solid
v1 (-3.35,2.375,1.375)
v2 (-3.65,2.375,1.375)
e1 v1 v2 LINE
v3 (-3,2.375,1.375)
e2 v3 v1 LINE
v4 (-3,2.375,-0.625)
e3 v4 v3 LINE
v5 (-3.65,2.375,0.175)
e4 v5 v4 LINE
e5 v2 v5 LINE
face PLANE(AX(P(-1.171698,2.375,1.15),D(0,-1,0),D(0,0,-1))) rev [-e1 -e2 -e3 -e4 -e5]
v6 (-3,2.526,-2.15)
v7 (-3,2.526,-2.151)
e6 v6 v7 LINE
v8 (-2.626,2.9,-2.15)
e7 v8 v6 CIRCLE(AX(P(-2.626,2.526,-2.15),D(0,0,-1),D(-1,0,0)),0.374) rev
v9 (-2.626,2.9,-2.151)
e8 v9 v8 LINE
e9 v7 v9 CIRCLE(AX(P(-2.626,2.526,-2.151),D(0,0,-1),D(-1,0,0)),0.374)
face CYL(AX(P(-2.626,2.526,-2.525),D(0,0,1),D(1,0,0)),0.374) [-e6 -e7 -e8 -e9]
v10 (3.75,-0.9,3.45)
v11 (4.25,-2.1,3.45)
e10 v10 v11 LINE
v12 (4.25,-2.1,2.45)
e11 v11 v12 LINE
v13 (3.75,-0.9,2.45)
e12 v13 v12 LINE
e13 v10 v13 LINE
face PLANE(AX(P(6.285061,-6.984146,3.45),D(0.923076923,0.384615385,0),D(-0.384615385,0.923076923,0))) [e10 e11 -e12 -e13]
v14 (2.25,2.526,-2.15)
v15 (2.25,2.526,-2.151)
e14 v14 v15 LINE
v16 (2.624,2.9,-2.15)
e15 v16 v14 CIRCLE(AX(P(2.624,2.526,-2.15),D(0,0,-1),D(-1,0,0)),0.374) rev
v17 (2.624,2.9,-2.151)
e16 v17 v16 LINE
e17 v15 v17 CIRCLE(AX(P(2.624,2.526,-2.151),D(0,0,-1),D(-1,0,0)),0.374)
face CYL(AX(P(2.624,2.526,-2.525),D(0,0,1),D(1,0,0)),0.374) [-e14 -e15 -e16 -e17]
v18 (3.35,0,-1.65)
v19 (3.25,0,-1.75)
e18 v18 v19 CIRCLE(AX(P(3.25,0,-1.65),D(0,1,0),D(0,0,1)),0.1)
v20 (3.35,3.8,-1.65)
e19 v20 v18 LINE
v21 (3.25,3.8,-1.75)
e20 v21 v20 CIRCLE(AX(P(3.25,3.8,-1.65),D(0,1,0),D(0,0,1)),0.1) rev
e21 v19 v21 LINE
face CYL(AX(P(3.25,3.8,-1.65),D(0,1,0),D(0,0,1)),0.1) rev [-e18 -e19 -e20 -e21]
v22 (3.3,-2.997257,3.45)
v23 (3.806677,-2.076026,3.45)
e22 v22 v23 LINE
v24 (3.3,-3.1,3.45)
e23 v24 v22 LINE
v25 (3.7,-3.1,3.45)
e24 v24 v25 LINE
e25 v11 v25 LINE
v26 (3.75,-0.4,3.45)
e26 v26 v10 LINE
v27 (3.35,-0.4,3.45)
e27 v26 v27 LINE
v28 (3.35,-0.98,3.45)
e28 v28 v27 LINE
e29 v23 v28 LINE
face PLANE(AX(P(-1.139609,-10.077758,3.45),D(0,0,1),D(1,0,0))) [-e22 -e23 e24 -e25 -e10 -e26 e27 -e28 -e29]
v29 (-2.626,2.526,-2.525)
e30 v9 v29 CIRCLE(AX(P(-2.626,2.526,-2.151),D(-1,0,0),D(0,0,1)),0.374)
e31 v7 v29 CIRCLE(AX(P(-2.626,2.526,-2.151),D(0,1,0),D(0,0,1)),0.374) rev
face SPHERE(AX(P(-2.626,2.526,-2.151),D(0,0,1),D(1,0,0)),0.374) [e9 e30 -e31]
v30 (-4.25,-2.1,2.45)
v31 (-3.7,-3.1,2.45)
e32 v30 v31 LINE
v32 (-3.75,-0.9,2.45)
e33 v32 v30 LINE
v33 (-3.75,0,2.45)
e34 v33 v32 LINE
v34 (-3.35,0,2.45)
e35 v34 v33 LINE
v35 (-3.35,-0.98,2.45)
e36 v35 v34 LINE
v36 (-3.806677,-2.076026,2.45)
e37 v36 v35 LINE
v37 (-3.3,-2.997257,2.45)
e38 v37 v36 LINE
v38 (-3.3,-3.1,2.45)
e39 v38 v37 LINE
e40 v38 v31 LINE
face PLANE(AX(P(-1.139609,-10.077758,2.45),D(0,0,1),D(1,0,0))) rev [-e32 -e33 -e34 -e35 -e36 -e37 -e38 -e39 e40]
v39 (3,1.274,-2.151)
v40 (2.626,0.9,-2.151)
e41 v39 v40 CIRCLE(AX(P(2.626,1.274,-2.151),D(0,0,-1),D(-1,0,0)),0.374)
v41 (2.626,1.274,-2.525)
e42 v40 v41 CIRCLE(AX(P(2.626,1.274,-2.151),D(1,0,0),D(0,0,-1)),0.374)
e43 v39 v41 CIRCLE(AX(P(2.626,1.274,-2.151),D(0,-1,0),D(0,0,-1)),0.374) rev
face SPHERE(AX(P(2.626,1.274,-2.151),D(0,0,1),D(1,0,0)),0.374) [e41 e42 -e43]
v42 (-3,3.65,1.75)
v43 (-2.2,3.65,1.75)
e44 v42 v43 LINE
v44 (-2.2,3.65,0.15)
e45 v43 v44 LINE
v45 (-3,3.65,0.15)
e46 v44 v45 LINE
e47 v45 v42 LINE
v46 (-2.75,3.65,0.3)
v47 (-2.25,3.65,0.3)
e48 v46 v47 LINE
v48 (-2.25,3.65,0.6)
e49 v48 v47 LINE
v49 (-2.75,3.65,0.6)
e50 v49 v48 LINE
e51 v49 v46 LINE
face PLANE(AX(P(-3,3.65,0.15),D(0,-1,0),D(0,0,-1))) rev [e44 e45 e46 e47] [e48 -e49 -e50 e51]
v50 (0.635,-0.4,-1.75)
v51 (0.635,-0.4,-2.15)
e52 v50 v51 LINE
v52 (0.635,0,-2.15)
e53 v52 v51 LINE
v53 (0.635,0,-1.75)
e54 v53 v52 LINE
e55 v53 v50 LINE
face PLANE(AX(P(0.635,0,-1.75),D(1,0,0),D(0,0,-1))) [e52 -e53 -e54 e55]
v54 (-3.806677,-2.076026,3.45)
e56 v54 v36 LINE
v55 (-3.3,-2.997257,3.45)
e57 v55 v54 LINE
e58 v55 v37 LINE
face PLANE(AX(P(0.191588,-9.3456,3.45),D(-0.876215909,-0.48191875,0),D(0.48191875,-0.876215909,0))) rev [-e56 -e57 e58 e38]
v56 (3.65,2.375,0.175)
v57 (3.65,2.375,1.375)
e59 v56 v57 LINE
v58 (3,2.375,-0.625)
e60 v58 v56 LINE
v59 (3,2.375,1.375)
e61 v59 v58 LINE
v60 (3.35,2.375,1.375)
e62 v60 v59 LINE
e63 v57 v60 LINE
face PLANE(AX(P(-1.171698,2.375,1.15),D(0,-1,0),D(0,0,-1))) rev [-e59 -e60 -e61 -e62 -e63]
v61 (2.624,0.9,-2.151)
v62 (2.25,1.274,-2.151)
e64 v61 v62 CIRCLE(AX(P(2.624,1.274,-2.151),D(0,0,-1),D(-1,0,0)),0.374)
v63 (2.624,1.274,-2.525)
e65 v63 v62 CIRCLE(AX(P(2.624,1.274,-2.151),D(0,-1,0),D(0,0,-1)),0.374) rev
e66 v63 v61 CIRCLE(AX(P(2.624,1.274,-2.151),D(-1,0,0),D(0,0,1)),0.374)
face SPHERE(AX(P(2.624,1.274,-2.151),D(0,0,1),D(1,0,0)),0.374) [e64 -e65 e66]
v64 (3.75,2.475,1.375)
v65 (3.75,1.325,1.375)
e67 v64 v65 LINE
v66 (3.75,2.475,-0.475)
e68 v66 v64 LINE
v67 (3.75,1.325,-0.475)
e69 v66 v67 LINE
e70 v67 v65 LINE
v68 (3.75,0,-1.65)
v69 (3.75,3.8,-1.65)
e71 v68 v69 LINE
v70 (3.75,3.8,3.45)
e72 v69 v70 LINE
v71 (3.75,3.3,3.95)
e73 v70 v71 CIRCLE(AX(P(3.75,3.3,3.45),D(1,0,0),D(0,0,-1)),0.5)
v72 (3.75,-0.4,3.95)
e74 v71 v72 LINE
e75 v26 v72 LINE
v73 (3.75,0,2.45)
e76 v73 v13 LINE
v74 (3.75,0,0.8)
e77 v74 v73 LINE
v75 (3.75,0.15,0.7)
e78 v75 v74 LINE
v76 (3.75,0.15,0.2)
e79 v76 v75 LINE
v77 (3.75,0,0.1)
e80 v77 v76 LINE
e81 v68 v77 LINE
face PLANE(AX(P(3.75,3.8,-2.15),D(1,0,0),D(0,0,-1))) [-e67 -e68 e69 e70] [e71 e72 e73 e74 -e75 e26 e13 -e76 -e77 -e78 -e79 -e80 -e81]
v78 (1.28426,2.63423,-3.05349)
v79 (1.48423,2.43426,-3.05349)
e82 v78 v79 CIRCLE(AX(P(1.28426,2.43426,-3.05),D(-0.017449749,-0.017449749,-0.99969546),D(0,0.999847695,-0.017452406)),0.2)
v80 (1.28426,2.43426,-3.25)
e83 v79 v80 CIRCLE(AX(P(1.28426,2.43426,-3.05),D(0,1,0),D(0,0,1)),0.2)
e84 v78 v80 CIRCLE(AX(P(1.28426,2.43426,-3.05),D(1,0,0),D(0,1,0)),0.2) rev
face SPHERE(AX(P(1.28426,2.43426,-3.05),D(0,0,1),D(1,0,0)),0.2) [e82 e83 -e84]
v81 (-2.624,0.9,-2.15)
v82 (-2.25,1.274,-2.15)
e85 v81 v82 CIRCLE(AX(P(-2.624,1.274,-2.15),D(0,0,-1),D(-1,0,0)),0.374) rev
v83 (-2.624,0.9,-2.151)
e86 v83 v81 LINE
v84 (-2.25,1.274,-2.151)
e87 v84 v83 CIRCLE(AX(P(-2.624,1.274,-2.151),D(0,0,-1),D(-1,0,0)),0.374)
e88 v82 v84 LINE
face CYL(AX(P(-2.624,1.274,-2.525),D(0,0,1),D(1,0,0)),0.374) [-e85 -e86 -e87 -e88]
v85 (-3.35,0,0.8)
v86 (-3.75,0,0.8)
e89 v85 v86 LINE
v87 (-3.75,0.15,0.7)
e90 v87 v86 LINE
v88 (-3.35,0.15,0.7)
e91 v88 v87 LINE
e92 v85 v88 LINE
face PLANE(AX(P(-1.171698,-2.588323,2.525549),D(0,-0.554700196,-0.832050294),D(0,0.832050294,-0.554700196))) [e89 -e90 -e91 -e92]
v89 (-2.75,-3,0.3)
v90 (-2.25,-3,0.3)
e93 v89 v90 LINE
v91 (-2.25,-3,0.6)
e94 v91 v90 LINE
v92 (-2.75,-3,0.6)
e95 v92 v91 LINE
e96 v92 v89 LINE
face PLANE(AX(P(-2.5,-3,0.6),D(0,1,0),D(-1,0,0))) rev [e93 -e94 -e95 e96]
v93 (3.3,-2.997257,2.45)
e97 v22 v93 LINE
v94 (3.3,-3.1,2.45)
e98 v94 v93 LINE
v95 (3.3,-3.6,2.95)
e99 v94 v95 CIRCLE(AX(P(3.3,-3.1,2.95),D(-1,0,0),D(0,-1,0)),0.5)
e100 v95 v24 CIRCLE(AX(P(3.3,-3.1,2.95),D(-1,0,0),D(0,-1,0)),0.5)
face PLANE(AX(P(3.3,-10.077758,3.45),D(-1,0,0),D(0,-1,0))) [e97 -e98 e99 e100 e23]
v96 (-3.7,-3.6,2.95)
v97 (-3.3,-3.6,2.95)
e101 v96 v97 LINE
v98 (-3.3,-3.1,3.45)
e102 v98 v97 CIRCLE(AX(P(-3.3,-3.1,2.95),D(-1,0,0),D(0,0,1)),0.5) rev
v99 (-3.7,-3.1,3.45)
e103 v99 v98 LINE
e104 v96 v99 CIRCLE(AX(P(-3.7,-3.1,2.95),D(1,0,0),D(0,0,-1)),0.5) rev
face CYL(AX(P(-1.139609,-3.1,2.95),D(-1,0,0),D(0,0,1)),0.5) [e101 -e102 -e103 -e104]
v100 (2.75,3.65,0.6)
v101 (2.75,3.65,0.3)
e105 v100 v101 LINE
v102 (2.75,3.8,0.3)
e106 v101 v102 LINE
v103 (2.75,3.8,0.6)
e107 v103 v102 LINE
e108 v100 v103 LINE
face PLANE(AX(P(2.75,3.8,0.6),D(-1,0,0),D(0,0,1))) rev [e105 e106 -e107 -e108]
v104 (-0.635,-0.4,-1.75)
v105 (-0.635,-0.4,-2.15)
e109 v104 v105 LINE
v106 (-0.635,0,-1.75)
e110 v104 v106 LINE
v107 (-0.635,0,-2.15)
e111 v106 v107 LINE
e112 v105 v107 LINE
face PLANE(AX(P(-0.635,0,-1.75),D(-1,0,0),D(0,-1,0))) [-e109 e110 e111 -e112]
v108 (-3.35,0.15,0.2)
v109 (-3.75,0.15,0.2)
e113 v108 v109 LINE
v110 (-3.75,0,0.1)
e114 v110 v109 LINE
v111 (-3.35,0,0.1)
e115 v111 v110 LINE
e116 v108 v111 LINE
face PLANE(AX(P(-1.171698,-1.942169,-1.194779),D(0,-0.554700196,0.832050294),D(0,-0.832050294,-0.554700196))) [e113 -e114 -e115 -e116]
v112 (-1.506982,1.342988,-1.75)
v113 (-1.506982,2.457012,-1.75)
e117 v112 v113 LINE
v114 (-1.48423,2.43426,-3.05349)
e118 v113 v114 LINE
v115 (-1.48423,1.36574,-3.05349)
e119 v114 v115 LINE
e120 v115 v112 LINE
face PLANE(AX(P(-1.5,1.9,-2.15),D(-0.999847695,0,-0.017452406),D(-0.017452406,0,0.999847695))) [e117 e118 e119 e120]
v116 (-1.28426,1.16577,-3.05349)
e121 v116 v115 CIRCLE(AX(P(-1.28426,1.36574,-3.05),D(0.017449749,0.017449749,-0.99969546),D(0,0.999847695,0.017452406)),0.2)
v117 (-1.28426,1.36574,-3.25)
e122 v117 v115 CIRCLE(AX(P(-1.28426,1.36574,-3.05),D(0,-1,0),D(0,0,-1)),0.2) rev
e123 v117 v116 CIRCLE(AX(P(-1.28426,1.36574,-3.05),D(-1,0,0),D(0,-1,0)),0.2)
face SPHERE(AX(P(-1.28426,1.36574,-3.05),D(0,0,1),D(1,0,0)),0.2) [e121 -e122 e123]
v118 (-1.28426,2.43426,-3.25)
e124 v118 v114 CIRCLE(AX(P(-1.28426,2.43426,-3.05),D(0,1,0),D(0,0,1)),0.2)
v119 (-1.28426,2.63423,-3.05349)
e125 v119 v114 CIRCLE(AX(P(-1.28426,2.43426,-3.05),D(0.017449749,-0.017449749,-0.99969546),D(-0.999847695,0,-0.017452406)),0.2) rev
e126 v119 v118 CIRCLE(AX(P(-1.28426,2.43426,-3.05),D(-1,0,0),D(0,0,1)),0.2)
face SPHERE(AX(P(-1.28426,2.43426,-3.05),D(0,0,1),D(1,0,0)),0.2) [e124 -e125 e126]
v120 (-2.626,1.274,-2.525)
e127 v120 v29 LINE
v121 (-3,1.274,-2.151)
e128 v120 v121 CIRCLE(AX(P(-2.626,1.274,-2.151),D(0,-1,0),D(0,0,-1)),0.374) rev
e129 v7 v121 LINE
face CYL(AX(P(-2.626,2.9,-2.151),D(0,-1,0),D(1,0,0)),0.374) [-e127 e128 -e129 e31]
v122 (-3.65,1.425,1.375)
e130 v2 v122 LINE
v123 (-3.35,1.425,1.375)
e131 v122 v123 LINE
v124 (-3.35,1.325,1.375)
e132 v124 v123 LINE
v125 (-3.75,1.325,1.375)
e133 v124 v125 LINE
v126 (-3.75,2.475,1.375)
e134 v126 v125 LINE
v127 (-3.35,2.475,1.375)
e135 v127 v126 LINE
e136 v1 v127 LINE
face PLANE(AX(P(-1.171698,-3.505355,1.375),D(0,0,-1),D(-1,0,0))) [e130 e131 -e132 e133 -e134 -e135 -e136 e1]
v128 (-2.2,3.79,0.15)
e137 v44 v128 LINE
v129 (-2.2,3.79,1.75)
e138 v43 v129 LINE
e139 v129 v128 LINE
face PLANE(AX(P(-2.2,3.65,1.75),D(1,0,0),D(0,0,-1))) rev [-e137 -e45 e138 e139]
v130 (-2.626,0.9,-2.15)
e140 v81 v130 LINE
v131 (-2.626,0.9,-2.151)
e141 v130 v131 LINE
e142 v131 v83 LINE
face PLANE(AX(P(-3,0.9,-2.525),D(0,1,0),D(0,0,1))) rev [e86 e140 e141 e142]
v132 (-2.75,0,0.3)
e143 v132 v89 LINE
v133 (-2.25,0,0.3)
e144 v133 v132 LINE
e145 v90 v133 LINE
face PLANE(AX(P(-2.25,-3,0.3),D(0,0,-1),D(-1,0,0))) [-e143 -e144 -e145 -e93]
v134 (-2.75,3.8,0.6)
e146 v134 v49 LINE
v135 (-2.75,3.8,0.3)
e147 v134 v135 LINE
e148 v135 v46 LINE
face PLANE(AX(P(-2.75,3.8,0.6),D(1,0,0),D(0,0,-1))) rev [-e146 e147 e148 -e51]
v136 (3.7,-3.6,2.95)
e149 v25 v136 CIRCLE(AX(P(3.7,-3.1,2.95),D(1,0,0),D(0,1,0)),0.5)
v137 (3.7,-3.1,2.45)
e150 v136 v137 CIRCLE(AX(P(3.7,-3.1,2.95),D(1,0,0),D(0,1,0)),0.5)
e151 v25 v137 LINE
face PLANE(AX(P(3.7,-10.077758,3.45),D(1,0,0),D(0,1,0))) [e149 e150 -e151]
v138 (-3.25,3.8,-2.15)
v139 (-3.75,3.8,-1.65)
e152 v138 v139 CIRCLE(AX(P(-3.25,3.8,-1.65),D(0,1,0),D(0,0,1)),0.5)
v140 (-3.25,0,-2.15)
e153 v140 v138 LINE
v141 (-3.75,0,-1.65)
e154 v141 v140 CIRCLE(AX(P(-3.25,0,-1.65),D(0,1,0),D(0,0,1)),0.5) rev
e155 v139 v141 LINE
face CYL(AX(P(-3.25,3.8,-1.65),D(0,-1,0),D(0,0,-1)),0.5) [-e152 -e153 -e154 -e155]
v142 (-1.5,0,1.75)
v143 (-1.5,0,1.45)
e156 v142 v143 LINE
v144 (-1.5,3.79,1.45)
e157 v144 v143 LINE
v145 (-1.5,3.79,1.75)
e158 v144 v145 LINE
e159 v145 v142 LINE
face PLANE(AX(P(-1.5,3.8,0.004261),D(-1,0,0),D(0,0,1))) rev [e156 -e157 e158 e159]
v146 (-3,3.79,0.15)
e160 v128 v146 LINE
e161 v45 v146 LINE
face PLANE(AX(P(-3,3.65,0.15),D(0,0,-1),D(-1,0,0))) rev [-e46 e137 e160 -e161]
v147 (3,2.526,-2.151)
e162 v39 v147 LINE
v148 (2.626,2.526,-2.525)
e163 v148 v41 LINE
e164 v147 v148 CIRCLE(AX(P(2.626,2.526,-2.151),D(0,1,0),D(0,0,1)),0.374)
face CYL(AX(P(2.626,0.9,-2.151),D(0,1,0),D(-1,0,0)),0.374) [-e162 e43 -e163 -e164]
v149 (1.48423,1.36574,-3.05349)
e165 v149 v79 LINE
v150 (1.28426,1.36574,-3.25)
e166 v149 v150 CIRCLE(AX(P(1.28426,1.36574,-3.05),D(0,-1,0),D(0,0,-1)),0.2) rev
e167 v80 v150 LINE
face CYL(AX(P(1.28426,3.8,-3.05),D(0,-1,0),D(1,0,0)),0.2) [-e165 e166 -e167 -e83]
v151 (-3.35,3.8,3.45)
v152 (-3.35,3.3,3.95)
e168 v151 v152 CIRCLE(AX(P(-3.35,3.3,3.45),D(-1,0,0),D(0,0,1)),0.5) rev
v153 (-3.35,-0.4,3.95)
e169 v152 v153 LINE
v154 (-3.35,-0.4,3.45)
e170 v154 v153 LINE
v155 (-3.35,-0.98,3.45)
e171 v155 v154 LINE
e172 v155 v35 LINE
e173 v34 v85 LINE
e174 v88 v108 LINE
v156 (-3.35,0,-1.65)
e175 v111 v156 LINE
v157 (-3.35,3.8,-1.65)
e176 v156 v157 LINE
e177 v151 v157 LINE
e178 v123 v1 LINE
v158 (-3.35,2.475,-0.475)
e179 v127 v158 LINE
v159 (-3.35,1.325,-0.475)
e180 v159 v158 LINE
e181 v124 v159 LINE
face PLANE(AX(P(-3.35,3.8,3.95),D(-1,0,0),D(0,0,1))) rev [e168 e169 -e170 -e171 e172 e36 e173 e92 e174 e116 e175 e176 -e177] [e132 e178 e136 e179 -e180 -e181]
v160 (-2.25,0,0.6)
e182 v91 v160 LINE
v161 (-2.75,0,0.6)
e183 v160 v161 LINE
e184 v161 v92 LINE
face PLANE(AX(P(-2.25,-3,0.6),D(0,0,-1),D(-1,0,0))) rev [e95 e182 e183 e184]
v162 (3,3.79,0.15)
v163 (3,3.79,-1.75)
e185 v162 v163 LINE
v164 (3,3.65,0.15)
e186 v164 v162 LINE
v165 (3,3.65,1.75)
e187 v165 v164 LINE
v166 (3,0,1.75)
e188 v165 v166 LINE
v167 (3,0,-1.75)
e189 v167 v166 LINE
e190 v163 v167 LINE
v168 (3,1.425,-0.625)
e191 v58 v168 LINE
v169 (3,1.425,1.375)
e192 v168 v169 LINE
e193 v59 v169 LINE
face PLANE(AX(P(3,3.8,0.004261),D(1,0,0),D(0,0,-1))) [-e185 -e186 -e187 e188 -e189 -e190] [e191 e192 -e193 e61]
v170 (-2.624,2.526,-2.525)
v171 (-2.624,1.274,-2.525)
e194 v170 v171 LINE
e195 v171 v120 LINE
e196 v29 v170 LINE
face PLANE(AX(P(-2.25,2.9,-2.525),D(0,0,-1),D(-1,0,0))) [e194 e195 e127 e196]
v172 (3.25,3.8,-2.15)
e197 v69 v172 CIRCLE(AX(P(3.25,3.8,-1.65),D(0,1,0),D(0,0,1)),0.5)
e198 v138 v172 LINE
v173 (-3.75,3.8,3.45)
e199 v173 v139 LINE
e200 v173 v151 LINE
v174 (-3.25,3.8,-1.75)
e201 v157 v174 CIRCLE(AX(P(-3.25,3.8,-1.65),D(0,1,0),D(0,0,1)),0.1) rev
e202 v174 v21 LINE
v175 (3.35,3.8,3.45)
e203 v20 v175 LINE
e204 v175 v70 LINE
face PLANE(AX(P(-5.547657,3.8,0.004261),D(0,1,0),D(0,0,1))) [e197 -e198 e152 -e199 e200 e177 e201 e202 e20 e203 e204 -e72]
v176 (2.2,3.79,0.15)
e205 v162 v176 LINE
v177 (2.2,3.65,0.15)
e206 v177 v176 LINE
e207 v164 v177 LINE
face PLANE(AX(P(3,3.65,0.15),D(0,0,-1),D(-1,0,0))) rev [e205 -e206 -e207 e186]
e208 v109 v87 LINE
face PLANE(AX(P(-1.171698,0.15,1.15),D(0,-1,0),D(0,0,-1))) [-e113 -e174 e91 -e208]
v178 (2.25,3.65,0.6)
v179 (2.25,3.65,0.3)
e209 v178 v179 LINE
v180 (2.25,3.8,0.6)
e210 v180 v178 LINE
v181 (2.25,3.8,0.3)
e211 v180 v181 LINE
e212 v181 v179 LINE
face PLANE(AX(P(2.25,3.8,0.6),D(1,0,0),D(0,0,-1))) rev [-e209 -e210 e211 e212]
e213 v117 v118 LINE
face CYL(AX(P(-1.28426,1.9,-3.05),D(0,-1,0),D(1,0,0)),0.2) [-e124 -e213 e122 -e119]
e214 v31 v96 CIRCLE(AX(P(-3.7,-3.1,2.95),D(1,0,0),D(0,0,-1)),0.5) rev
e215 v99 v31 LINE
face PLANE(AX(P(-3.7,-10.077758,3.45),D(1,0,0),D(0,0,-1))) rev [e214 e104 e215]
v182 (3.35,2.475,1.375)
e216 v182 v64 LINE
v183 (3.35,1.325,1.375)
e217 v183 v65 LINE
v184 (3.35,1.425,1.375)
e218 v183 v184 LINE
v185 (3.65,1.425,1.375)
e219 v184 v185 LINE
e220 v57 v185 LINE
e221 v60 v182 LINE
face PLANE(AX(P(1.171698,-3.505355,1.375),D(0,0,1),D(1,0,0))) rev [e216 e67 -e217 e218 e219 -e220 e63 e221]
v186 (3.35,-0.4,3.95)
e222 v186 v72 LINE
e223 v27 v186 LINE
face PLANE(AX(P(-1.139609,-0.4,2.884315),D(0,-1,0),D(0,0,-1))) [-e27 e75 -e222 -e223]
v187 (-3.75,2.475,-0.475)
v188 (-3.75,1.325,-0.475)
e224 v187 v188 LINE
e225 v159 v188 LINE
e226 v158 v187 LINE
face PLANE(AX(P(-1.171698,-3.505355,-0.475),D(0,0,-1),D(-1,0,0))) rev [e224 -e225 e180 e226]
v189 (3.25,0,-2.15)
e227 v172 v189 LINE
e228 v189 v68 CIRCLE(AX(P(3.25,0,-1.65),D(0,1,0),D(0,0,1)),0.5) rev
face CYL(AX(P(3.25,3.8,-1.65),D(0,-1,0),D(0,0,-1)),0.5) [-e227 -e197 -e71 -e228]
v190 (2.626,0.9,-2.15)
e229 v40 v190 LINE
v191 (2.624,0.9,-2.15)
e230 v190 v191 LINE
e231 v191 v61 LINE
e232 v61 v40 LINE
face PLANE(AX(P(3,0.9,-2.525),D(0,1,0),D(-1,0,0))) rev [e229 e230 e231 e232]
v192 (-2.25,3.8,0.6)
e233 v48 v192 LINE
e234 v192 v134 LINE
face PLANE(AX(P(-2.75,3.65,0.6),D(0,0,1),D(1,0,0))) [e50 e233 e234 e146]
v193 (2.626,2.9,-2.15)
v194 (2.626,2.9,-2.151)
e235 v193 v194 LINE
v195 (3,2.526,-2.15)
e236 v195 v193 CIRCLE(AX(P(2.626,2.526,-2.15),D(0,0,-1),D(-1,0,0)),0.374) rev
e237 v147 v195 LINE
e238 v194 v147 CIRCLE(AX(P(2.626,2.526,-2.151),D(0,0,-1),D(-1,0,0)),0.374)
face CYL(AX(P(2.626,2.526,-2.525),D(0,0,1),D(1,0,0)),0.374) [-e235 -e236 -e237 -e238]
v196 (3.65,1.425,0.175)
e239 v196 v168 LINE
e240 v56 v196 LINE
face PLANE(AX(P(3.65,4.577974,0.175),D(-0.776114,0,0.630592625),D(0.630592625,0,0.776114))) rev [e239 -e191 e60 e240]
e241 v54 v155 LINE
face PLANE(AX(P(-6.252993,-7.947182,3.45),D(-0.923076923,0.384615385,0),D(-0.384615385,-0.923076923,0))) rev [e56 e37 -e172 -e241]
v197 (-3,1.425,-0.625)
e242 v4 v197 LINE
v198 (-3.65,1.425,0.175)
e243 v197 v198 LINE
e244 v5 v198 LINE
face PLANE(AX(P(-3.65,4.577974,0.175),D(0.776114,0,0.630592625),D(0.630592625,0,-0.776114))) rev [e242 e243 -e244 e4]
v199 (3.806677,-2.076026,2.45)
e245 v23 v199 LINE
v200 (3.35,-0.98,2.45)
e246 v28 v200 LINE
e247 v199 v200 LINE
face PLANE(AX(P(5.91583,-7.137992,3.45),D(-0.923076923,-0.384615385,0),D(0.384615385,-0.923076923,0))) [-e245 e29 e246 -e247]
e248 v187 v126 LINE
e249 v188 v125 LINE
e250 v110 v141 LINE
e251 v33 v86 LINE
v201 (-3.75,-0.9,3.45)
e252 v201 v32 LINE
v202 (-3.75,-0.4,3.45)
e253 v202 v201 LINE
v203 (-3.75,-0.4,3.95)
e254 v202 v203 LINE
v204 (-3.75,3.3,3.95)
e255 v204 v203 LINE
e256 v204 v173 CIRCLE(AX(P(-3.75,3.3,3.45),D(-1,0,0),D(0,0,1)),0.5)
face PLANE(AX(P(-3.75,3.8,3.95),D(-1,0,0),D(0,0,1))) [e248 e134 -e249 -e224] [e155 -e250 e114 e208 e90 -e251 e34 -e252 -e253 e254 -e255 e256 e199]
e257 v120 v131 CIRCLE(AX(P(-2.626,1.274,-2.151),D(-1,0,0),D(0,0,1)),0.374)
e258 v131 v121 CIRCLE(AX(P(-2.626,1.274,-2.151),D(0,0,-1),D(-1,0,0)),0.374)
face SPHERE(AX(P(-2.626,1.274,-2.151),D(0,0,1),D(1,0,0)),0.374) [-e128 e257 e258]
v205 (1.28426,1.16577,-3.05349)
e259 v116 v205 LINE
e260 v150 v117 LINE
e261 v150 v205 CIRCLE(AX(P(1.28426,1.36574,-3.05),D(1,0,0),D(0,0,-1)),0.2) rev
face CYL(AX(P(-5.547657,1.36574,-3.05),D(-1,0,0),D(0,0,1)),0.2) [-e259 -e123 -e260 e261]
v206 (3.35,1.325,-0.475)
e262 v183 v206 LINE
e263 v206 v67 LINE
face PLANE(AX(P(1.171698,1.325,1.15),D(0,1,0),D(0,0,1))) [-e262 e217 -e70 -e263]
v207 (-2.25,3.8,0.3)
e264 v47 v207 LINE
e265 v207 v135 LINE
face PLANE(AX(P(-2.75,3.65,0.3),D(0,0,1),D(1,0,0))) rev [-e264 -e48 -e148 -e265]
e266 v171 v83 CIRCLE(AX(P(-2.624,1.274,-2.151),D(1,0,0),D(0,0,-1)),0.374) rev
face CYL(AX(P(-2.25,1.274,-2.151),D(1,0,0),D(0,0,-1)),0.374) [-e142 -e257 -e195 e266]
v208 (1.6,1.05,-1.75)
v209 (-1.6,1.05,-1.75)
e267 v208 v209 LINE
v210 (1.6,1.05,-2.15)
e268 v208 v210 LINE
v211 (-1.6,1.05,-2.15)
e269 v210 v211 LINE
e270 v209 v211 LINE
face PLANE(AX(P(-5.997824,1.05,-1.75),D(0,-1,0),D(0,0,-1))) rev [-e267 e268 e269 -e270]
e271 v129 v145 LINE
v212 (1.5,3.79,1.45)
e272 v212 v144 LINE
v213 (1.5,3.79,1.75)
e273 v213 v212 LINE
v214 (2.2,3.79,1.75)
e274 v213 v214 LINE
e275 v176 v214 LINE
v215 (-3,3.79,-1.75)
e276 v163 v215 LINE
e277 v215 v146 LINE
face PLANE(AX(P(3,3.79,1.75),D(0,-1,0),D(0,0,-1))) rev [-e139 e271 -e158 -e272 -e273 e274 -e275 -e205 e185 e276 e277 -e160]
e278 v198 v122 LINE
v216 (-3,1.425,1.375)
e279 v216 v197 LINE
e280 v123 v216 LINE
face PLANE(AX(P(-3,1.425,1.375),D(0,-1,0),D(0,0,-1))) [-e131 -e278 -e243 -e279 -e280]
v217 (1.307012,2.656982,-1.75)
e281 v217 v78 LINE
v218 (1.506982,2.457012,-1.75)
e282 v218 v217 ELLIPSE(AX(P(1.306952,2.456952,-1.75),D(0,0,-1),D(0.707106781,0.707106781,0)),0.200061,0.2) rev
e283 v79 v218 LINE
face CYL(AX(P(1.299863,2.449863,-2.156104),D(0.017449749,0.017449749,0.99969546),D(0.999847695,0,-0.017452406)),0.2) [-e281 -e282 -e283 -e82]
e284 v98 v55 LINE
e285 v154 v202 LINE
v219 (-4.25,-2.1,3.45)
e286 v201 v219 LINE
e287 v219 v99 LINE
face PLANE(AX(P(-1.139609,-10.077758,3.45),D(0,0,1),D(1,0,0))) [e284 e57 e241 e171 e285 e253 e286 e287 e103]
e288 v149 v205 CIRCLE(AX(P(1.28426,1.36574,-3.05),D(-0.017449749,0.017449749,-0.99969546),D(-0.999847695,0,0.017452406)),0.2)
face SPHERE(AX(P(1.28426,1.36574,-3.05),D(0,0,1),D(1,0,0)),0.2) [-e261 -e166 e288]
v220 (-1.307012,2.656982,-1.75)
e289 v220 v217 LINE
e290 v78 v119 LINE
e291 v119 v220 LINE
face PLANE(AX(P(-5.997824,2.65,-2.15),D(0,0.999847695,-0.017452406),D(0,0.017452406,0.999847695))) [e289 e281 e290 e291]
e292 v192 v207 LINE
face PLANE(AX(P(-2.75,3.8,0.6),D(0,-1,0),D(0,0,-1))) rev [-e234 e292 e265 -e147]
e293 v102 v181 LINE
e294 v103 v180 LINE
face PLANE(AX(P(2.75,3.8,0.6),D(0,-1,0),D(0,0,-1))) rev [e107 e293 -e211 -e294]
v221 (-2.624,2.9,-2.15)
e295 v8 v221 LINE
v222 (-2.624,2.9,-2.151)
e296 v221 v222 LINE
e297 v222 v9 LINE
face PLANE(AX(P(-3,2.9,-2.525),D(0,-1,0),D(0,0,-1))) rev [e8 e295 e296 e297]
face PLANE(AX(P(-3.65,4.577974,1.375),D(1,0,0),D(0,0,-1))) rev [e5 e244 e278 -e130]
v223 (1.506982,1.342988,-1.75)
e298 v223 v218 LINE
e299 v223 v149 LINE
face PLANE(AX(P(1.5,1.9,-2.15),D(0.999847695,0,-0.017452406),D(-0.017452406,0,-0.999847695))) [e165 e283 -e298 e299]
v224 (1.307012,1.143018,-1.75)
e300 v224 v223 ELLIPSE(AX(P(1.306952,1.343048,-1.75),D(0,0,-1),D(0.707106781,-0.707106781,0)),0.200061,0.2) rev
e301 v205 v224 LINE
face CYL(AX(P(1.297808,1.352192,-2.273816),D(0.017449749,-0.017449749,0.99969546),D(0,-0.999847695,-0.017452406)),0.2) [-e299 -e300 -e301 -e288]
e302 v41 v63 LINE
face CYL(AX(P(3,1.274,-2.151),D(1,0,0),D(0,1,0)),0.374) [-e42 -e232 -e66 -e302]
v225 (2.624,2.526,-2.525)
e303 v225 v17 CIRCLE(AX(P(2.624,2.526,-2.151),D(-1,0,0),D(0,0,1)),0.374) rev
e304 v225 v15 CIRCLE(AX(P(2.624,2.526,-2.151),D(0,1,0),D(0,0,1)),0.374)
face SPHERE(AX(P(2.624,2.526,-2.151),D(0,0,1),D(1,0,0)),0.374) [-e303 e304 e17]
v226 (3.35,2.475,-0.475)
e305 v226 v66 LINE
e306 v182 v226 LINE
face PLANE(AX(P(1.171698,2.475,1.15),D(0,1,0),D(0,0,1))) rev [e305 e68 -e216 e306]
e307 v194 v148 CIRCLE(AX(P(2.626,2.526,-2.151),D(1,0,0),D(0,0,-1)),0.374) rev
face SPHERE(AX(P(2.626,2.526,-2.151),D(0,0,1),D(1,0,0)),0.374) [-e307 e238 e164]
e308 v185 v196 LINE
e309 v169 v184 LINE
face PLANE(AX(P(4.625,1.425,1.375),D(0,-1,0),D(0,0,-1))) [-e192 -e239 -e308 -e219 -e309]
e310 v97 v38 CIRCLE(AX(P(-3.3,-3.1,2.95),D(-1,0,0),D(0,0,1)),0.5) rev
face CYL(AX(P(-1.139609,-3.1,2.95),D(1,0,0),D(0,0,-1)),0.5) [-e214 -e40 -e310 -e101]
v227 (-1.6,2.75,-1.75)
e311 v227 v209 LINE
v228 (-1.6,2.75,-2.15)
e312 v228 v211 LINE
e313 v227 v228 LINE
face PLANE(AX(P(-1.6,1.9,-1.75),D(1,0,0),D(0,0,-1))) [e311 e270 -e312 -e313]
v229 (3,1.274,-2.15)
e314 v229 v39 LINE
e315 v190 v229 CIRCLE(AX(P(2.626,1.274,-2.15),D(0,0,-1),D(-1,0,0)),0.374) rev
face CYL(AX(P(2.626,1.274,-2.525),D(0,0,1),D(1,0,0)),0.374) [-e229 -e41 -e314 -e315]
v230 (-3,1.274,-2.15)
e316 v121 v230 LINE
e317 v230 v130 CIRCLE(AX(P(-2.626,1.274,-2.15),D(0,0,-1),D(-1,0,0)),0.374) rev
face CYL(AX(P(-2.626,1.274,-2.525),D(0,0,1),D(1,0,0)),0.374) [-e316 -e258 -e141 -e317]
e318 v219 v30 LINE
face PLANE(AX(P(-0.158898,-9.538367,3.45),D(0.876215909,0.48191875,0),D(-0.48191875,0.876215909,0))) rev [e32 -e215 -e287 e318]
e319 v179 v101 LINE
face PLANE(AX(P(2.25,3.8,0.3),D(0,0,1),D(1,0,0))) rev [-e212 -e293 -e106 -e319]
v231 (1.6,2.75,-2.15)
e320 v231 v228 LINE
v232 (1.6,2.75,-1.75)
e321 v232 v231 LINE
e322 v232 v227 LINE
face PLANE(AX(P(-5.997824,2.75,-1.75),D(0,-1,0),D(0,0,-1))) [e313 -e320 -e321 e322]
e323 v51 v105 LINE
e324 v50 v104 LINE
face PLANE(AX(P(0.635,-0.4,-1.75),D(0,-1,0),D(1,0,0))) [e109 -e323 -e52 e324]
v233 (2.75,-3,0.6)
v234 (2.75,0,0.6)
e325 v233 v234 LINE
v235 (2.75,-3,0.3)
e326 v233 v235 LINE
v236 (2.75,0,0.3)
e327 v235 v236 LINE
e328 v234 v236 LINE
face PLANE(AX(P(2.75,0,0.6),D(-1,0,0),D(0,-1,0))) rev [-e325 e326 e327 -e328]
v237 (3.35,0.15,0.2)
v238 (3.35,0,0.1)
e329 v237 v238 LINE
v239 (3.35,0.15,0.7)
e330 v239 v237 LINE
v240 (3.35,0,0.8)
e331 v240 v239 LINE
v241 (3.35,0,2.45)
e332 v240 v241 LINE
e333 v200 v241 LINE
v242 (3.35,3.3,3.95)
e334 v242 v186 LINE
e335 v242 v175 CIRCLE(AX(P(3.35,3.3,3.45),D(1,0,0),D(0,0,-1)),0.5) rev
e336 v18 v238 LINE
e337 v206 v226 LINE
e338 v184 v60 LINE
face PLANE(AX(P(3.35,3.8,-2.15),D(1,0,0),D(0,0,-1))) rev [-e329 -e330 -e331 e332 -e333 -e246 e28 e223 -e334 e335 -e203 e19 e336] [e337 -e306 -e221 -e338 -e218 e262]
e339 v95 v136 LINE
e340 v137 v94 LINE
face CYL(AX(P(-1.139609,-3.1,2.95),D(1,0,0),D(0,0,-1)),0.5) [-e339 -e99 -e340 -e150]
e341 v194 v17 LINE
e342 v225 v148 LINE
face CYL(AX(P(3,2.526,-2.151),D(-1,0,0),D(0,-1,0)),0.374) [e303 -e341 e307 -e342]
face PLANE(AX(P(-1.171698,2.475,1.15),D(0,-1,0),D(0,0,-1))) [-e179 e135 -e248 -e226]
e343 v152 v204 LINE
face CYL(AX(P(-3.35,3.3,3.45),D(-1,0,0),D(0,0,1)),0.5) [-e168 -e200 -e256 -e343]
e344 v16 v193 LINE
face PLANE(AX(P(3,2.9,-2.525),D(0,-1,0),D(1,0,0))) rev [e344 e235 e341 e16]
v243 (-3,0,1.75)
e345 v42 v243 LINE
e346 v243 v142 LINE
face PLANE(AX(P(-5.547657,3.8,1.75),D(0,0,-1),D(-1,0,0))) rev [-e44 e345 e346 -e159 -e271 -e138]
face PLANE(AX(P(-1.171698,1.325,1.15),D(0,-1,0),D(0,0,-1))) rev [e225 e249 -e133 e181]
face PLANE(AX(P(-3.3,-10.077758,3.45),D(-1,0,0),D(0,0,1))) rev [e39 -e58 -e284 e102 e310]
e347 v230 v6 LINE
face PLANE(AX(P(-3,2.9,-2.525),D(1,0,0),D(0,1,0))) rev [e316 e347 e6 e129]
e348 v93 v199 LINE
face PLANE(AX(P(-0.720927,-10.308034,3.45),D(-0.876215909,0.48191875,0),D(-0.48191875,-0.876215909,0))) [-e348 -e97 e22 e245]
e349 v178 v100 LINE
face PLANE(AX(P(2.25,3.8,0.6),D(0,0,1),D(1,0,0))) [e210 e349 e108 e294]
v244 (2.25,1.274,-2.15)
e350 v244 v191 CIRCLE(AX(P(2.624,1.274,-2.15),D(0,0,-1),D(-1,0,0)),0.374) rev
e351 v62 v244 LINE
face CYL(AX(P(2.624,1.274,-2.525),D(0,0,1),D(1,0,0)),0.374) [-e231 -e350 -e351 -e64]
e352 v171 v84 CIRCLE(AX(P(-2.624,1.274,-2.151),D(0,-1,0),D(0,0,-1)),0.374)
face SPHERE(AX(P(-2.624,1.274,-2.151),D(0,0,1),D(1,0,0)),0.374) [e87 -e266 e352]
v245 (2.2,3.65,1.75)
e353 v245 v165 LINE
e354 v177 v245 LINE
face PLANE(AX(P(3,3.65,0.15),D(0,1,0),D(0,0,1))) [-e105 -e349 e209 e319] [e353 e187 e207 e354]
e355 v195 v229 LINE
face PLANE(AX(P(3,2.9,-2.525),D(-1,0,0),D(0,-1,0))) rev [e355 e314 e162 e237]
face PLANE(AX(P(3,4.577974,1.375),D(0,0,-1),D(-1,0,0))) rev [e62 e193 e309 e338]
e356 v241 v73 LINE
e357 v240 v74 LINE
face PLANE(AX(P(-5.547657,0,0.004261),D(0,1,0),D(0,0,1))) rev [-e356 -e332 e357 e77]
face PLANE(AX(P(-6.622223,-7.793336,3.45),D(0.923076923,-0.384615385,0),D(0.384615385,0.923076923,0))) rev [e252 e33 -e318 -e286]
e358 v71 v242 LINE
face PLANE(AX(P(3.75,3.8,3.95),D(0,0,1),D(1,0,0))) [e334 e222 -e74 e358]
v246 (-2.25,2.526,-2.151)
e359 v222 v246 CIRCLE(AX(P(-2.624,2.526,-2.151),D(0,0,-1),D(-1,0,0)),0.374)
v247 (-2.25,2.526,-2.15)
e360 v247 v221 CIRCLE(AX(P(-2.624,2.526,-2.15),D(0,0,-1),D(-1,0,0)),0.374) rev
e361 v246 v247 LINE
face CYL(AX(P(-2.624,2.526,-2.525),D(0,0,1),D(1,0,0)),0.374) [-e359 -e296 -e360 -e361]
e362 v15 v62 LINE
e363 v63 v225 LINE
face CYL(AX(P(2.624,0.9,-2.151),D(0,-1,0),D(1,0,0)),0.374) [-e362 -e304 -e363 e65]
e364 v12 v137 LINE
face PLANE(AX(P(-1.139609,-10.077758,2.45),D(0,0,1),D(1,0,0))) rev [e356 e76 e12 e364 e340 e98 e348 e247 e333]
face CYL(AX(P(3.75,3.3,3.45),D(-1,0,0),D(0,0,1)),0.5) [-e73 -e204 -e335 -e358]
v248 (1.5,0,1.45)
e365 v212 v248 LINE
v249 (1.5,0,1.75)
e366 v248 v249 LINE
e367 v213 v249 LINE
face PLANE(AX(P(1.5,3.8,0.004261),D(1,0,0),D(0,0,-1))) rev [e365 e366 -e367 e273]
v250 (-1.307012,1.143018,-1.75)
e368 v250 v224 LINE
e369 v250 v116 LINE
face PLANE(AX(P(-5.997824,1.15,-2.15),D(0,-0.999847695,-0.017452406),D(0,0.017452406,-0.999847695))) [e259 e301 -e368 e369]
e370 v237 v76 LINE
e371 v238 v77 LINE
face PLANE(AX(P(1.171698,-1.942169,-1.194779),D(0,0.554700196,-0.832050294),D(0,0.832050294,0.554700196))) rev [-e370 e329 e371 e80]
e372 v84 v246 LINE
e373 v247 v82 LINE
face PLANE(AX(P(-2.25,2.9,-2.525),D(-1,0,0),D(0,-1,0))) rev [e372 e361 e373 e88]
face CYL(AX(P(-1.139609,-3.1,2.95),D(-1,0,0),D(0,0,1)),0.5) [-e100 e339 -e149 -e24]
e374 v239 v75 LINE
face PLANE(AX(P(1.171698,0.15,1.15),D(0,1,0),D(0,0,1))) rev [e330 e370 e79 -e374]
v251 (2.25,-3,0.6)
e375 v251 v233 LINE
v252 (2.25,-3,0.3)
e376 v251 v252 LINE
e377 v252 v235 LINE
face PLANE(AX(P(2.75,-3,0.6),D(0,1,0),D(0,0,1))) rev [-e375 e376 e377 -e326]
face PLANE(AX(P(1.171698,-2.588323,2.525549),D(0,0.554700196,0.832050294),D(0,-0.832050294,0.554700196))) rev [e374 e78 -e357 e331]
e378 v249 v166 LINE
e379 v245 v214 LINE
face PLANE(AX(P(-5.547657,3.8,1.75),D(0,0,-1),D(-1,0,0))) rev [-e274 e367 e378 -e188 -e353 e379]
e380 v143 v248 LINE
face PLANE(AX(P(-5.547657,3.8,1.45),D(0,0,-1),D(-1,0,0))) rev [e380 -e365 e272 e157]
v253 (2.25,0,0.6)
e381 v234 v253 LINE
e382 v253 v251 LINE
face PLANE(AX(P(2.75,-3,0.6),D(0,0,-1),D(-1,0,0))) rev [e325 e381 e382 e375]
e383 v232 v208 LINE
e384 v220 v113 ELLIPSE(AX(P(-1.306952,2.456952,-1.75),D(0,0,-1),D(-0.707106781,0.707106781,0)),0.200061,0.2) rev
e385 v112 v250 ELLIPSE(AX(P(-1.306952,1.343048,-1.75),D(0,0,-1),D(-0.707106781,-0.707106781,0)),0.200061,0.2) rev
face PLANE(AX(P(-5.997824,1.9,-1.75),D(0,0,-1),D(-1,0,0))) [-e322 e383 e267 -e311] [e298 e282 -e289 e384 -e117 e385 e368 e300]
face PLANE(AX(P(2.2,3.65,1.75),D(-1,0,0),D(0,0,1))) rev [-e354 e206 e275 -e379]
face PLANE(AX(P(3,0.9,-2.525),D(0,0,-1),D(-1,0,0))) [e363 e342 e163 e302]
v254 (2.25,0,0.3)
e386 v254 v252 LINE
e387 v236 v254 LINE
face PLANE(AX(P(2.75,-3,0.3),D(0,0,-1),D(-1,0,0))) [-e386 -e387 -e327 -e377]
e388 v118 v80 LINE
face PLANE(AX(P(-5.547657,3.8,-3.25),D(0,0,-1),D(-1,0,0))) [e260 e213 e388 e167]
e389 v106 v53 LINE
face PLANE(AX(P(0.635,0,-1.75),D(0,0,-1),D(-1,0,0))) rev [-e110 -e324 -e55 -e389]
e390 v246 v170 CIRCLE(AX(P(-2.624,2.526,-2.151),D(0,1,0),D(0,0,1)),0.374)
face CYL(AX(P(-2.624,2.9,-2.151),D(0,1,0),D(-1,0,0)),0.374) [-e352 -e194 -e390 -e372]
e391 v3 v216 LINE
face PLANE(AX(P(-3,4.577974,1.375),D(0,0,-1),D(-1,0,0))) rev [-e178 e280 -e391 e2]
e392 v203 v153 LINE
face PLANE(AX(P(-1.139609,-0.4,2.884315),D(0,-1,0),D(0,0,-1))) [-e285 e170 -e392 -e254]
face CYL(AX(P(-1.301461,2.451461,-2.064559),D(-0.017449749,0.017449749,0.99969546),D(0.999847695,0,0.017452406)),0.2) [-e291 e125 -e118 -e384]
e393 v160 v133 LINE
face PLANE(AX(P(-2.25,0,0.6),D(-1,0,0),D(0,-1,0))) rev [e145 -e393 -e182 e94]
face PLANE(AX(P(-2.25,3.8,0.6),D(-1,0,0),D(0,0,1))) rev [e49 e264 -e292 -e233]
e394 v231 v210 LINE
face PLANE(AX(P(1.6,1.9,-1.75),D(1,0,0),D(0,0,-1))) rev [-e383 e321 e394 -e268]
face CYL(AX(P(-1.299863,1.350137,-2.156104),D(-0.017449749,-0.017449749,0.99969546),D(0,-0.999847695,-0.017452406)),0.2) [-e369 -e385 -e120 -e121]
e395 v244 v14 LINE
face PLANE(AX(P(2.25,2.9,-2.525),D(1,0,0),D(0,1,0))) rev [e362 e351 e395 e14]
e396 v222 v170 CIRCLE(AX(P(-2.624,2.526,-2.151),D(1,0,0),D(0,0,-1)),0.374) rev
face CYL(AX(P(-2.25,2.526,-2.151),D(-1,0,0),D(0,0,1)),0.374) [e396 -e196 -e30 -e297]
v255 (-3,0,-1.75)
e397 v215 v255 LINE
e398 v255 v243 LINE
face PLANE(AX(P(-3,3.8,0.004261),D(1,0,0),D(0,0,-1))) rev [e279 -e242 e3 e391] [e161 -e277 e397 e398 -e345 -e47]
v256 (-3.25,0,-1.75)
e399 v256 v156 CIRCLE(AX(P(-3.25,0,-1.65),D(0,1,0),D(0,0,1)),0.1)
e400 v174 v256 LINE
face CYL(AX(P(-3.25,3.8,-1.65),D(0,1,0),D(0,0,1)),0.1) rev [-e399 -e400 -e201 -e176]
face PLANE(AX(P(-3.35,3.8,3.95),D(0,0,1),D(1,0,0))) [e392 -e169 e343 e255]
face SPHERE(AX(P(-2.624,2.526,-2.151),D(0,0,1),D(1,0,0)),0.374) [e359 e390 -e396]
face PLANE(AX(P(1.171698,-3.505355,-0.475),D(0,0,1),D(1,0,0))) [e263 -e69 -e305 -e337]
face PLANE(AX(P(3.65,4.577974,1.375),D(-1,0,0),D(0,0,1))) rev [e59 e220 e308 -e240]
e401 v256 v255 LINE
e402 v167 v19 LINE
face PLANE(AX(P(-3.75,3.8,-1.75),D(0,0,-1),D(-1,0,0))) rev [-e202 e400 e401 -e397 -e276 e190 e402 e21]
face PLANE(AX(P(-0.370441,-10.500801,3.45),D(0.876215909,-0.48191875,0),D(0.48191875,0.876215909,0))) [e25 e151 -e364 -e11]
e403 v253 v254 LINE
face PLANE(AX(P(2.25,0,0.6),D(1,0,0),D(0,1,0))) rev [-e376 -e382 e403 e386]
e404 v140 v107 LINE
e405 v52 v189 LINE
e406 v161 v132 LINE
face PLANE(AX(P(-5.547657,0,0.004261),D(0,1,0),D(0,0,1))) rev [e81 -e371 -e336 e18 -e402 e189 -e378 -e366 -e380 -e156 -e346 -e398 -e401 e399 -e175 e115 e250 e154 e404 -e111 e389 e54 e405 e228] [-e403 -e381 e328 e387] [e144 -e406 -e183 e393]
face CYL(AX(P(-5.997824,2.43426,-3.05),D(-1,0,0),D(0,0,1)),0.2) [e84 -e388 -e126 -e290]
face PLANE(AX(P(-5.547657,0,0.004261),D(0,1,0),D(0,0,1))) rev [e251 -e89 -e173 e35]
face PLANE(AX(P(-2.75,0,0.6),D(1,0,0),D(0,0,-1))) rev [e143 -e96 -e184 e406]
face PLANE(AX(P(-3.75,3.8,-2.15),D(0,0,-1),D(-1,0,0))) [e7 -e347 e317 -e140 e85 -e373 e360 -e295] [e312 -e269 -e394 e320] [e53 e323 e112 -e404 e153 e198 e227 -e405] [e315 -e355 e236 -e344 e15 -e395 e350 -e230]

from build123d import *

# Parameters (mm, degrees)
EXTRUDE1_DEPTH      = 3.8
EXTRUDE_THIN1_DEPTH = 3.8
SKETCH3_W           = 0.8
SKETCH3_H           = 1.6
CUT_EXTRUDE1_DEPTH  = 0.15
FILLET1_R           = 0.5
SKETCH9_W           = 3.2
SKETCH9_H           = 1.7
SKETCH9_W_2         = 3
SKETCH9_H_2         = 1.5
CUT_EXTRUDE5_DEPTH  = 0.4
SKETCH11_W          = 6
SKETCH11_H          = 3.5
CUT_EXTRUDE6_DEPTH  = 0.01
FILLET6_R           = 0.1
EXTRUDE2_OUTLINE_W  = 2.961598858
EXTRUDE2_OUTLINE_H  = 1.461598858
EXTRUDE2_DEPTH      = 1.5
EXTRUDE2_DRAFT      = 1
FILLET7_R           = 0.2
SKETCH13_W          = 1.27
SKETCH13_H          = 0.4
EXTRUDE3_DEPTH      = 0.4
CUT_EXTRUDE7_DEPTH  = 0.4
CUT_EXTRUDE8_START  = -9.5
CUT_EXTRUDE8_DEPTH  = 2.4
EXTRUDE4_START      = 0.1
EXTRUDE4_DEPTH      = 0.95
SKETCH16_W          = 0.75
SKETCH16_H          = 2
EXTRUDE5_DEPTH      = 0.375
FILLET8_R           = 0.374
EXTRUDE6_DEPTH      = 0.5
EXTRUDE6_DEPTH_BACK = 0.5
EXTRUDE6_START      = -1
SKETCH17_W          = 0.4
SKETCH17_H          = 0.4
FILLET9_R           = 0.5
SKETCH17_3_W        = 0.4
SKETCH17_3_H        = 0.4
EXTRUDE7_DEPTH      = 0.5
EXTRUDE8_DEPTH      = 0.15
EXTRUDE8_DEPTH_BACK = 0.15
EXTRUDE8_START      = -3.5
SKETCH18_W          = 0.5
SKETCH18_H          = 0.15


# Read off the part's stored shape, not the designer's step: Extrude2
with BuildPart() as part:
    # Sketch1 → Extrude1 (new body)
    with BuildSketch(Plane(origin=(0, 0, 0), x_dir=(1, 0, 0), z_dir=(0, 1, 0))):
        Polygon((-1.5, -1.75), (-1.5, -1.45), (1.5, -1.45), (1.5, -1.75), (3, -1.75), (3, 1.75), (-3, 1.75), (-3, -1.75), align=None)
    extrude(amount=EXTRUDE1_DEPTH)

    # Sketch2 → Extrude-Thin1 (add)
    with BuildSketch(Plane(origin=(0, 0, 0), x_dir=(1, 0, 0), z_dir=(0, 1, 0))):
        Polygon((-3.75, -3.95), (-3.75, 2.15), (3.75, 2.15), (3.75, -3.95), (3.35, -3.95), (3.35, 1.75), (-3.35, 1.75), (-3.35, -3.95), align=None)
    extrude(amount=EXTRUDE_THIN1_DEPTH)

    # Sketch3 → Cut-Extrude1 (cut)
    with BuildSketch(Plane(origin=(0, 3.8, 0), x_dir=(-1, 0, 0), z_dir=(0, 1, 0))):
        with Locations((2.6, 0.95)):
            Rectangle(SKETCH3_W, SKETCH3_H)
        with Locations((-2.6, 0.95)):
            Rectangle(SKETCH3_W, SKETCH3_H)
    extrude(amount=-CUT_EXTRUDE1_DEPTH, mode=Mode.SUBTRACT)

    # Fillet1
    fillet1_edges = [part.edges().sort_by_distance(p)[0] for p in [
        (3.55, 3.8, 3.95),
        (3.75, 1.9, -2.15),
        (-3.75, 1.9, -2.15),
        (-3.55, 3.8, 3.95),
    ]]
    fillet(fillet1_edges, radius=FILLET1_R)

    # Sketch9 → Cut-Extrude5 (cut)
    # profile 1 of 2: a face of its own
    with BuildSketch(Plane(origin=(0, 0, -2.15), x_dir=(-1, 0, 0), z_dir=(0, 0, -1))):
        with Locations((0, 1.9)):
            Rectangle(SKETCH9_W, SKETCH9_H)
        with Locations((0, 1.9)):
            Rectangle(SKETCH9_W_2, SKETCH9_H_2, mode=Mode.SUBTRACT)
    # profile 2 of 2: a face of its own
    with BuildSketch(Plane(origin=(0, 0, -2.15), x_dir=(-1, 0, 0), z_dir=(0, 0, -1))):
        with Locations((0, 1.9)):
            Rectangle(SKETCH9_W_2, SKETCH9_H_2)
    extrude(amount=-CUT_EXTRUDE5_DEPTH, mode=Mode.SUBTRACT)

    # Sketch11 → Cut-Extrude6 (cut)
    with BuildSketch(Plane(origin=(0, 3.8, 0), x_dir=(-1, 0, 0), z_dir=(0, 1, 0))):
        Rectangle(SKETCH11_W, SKETCH11_H)
    extrude(amount=-CUT_EXTRUDE6_DEPTH, mode=Mode.SUBTRACT)

    # Fillet6
    fillet6_edges = [part.edges().sort_by_distance(p)[0] for p in [
        (-3.35, 1.9, -1.75),
        (3.35, 1.9, -1.75),
    ]]
    fillet(fillet6_edges, radius=FILLET6_R)


with BuildPart() as extrude2_tool:
    # Extrude2 outline → Extrude2 (with draft: the straight prism first)
    with BuildSketch(Plane(origin=(0, 0, -3.25), x_dir=(-1, 0, 0), z_dir=(0, 0, -1))):
        with Locations((0, 1.9)):
            Rectangle(EXTRUDE2_OUTLINE_W, EXTRUDE2_OUTLINE_H)
    extrude(amount=-EXTRUDE2_DEPTH)
    # Extrude2: the draft: its side faces are tilted about the plane it starts from
    extrude2_sides = [extrude2_tool.faces().sort_by_distance(p)[0] for p in [
        (-1.480799429, 1.9, -2.5),
        (0, 2.630799429, -2.5),
        (1.480799429, 1.9, -2.5),
        (0, 1.169200571, -2.5),
    ]]
    draft(extrude2_sides, Plane(origin=(0, 0, -3.25), x_dir=(-1, 0, 0), z_dir=(0, 0, -1)), EXTRUDE2_DRAFT)


with BuildPart() as part_1:
    add(part.part)

    # Extrude2: add extrude2_tool
    add(extrude2_tool.part)

    # Fillet7
    fillet7_edges = [part_1.edges().sort_by_distance(p)[0] for p in [
        (-1.493890728, 1.156109272, -2.5),
        (-1.480799429, 1.9, -3.25),
        (-1.493890728, 2.643890728, -2.5),
        (0, 2.630799429, -3.25),
        (1.493890728, 2.643890728, -2.5),
        (1.493890728, 1.156109272, -2.5),
        (1.480799429, 1.9, -3.25),
        (0, 1.169200571, -3.25),
    ]]
    fillet(fillet7_edges, radius=FILLET7_R)

    # Sketch13 → Extrude3 (add)
    with BuildSketch(Plane(origin=(0, 0, -2.15), x_dir=(-1, 0, 0), z_dir=(0, 0, -1))):
        with Locations((0, -0.2)):
            Rectangle(SKETCH13_W, SKETCH13_H)
    extrude(amount=-EXTRUDE3_DEPTH)

    # Sketch14 → Cut-Extrude7 (cut)
    with BuildSketch(Plane.ZY.offset(3.75)):
        Polygon((-0.475, 1.325), (0.45, 1.325), (1.375, 1.325), (1.375, 2.475), (-0.475, 2.475), align=None)
        Polygon((0.2, 0.15), (0.1, 0), (0.8, 0), (0.7, 0.15), align=None)
    extrude(amount=-CUT_EXTRUDE7_DEPTH, mode=Mode.SUBTRACT)

    # Sketch14<3> → Cut-Extrude8 (cut)
    with BuildSketch(Plane.ZY.offset(3.75).offset(CUT_EXTRUDE8_START)):
        Polygon((-0.475, 1.325), (0.45, 1.325), (1.375, 1.325), (1.375, 2.475), (-0.475, 2.475), align=None)
        Polygon((0.2, 0.15), (0.1, 0), (0.8, 0), (0.7, 0.15), align=None)
    extrude(amount=CUT_EXTRUDE8_DEPTH, mode=Mode.SUBTRACT)

    # Sketch15 → Extrude4 (add)
    with BuildSketch(Plane(origin=(0, 1.325, 0), x_dir=(-1, 0, 0), z_dir=(0, 1, 0)).offset(EXTRUDE4_START)):
        Polygon((3, 1.375), (3.65, 1.375), (3.65, 0.175), (3, -0.625), align=None)
        Polygon((-3, -0.625), (-3, 1.375), (-3.65, 1.375), (-3.65, 0.175), align=None)
    extrude(amount=EXTRUDE4_DEPTH)

    # Sketch16 → Extrude5 (add)
    with BuildSketch(Plane(origin=(0, 0, -2.15), x_dir=(-1, 0, 0), z_dir=(0, 0, -1))):
        with Locations((-2.625, 1.9)):
            Rectangle(SKETCH16_W, SKETCH16_H)
        with Locations((2.625, 1.9)):
            Rectangle(SKETCH16_W, SKETCH16_H)
    extrude(amount=EXTRUDE5_DEPTH)

    # Fillet8
    fillet8_edges = [part_1.edges().sort_by_distance(p)[0] for p in [
        (3, 2.9, -2.3375),
        (3, 0.9, -2.3375),
        (2.25, 0.9, -2.3375),
        (2.25, 2.9, -2.3375),
        (3, 1.9, -2.525),
        (2.625, 0.9, -2.525),
        (2.25, 1.9, -2.525),
        (2.625, 2.9, -2.525),
        (-3, 2.9, -2.3375),
        (-2.25, 2.9, -2.3375),
        (-2.25, 0.9, -2.3375),
        (-3, 0.9, -2.3375),
        (-2.625, 2.9, -2.525),
        (-2.25, 1.9, -2.525),
        (-2.625, 0.9, -2.525),
        (-3, 1.9, -2.525),
    ]]
    fillet(fillet8_edges, radius=FILLET8_R)

    # Sketch17 → Extrude6 (add, two sides: drawn at the far end of the back side and taken through both)
    with BuildSketch(Plane.XY.offset(3.95).offset(EXTRUDE6_START - EXTRUDE6_DEPTH_BACK)):
        Polygon((-3.35, -0.4), (-3.75, -0.4), (-3.75, -0.9), (-4.25, -2.1), (-3.7, -3.1), (-3.7, -3.6), (-3.5, -3.6), (-3.3, -3.6), (-3.3, -2.997257294), (-3.806677376, -2.076025702), (-3.35, -0.98), align=None)
        with Locations((-3.55, -0.2)):
            Rectangle(SKETCH17_W, SKETCH17_H)
        with Locations((3.55, -0.2)):
            Rectangle(SKETCH17_W, SKETCH17_H)
        Polygon((3.75, -0.4), (3.35, -0.4), (3.35, -0.98), (3.806677376, -2.076025702), (3.3, -2.997257294), (3.3, -3.6), (3.5, -3.6), (3.7, -3.6), (3.7, -3.1), (4.25, -2.1), (3.75, -0.9), align=None)
    extrude(amount=EXTRUDE6_DEPTH + EXTRUDE6_DEPTH_BACK)

    # Fillet9
    fillet9_edges = [part_1.edges().sort_by_distance(p)[0] for p in [
        (3.5, -3.6, 3.45),
        (3.5, -3.6, 2.45),
        (-3.5, -3.6, 3.45),
        (-3.5, -3.6, 2.45),
    ]]
    fillet(fillet9_edges, radius=FILLET9_R - 0.0001)  # a hair under: the kernel refuses the full size

    # Sketch17<3> → Extrude7 (add)
    with BuildSketch(Plane.XY.offset(3.95)):
        with Locations((-3.55, -0.2)):
            Rectangle(SKETCH17_3_W, SKETCH17_3_H)
        with Locations((3.55, -0.2)):
            Rectangle(SKETCH17_3_W, SKETCH17_3_H)
    extrude(amount=-EXTRUDE7_DEPTH)

    # Sketch18 → Extrude8 (add, two sides: drawn at the far end of the back side and taken through both)
    with BuildSketch(Plane.XY.offset(3.95).offset(EXTRUDE8_START - EXTRUDE8_DEPTH_BACK)):
        Polygon((2.75, 0), (2.25, 0), (2.25, -3), (2.5, -3), (2.75, -3), align=None)
        Polygon((-2.5, -3), (-2.25, -3), (-2.25, 0), (-2.75, 0), (-2.75, -3), align=None)
        with Locations((-2.5, 3.725)):
            Rectangle(SKETCH18_W, SKETCH18_H)
        with Locations((2.5, 3.725)):
            Rectangle(SKETCH18_W, SKETCH18_H)
    extrude(amount=EXTRUDE8_DEPTH + EXTRUDE8_DEPTH_BACK)


solid = part_1.part
